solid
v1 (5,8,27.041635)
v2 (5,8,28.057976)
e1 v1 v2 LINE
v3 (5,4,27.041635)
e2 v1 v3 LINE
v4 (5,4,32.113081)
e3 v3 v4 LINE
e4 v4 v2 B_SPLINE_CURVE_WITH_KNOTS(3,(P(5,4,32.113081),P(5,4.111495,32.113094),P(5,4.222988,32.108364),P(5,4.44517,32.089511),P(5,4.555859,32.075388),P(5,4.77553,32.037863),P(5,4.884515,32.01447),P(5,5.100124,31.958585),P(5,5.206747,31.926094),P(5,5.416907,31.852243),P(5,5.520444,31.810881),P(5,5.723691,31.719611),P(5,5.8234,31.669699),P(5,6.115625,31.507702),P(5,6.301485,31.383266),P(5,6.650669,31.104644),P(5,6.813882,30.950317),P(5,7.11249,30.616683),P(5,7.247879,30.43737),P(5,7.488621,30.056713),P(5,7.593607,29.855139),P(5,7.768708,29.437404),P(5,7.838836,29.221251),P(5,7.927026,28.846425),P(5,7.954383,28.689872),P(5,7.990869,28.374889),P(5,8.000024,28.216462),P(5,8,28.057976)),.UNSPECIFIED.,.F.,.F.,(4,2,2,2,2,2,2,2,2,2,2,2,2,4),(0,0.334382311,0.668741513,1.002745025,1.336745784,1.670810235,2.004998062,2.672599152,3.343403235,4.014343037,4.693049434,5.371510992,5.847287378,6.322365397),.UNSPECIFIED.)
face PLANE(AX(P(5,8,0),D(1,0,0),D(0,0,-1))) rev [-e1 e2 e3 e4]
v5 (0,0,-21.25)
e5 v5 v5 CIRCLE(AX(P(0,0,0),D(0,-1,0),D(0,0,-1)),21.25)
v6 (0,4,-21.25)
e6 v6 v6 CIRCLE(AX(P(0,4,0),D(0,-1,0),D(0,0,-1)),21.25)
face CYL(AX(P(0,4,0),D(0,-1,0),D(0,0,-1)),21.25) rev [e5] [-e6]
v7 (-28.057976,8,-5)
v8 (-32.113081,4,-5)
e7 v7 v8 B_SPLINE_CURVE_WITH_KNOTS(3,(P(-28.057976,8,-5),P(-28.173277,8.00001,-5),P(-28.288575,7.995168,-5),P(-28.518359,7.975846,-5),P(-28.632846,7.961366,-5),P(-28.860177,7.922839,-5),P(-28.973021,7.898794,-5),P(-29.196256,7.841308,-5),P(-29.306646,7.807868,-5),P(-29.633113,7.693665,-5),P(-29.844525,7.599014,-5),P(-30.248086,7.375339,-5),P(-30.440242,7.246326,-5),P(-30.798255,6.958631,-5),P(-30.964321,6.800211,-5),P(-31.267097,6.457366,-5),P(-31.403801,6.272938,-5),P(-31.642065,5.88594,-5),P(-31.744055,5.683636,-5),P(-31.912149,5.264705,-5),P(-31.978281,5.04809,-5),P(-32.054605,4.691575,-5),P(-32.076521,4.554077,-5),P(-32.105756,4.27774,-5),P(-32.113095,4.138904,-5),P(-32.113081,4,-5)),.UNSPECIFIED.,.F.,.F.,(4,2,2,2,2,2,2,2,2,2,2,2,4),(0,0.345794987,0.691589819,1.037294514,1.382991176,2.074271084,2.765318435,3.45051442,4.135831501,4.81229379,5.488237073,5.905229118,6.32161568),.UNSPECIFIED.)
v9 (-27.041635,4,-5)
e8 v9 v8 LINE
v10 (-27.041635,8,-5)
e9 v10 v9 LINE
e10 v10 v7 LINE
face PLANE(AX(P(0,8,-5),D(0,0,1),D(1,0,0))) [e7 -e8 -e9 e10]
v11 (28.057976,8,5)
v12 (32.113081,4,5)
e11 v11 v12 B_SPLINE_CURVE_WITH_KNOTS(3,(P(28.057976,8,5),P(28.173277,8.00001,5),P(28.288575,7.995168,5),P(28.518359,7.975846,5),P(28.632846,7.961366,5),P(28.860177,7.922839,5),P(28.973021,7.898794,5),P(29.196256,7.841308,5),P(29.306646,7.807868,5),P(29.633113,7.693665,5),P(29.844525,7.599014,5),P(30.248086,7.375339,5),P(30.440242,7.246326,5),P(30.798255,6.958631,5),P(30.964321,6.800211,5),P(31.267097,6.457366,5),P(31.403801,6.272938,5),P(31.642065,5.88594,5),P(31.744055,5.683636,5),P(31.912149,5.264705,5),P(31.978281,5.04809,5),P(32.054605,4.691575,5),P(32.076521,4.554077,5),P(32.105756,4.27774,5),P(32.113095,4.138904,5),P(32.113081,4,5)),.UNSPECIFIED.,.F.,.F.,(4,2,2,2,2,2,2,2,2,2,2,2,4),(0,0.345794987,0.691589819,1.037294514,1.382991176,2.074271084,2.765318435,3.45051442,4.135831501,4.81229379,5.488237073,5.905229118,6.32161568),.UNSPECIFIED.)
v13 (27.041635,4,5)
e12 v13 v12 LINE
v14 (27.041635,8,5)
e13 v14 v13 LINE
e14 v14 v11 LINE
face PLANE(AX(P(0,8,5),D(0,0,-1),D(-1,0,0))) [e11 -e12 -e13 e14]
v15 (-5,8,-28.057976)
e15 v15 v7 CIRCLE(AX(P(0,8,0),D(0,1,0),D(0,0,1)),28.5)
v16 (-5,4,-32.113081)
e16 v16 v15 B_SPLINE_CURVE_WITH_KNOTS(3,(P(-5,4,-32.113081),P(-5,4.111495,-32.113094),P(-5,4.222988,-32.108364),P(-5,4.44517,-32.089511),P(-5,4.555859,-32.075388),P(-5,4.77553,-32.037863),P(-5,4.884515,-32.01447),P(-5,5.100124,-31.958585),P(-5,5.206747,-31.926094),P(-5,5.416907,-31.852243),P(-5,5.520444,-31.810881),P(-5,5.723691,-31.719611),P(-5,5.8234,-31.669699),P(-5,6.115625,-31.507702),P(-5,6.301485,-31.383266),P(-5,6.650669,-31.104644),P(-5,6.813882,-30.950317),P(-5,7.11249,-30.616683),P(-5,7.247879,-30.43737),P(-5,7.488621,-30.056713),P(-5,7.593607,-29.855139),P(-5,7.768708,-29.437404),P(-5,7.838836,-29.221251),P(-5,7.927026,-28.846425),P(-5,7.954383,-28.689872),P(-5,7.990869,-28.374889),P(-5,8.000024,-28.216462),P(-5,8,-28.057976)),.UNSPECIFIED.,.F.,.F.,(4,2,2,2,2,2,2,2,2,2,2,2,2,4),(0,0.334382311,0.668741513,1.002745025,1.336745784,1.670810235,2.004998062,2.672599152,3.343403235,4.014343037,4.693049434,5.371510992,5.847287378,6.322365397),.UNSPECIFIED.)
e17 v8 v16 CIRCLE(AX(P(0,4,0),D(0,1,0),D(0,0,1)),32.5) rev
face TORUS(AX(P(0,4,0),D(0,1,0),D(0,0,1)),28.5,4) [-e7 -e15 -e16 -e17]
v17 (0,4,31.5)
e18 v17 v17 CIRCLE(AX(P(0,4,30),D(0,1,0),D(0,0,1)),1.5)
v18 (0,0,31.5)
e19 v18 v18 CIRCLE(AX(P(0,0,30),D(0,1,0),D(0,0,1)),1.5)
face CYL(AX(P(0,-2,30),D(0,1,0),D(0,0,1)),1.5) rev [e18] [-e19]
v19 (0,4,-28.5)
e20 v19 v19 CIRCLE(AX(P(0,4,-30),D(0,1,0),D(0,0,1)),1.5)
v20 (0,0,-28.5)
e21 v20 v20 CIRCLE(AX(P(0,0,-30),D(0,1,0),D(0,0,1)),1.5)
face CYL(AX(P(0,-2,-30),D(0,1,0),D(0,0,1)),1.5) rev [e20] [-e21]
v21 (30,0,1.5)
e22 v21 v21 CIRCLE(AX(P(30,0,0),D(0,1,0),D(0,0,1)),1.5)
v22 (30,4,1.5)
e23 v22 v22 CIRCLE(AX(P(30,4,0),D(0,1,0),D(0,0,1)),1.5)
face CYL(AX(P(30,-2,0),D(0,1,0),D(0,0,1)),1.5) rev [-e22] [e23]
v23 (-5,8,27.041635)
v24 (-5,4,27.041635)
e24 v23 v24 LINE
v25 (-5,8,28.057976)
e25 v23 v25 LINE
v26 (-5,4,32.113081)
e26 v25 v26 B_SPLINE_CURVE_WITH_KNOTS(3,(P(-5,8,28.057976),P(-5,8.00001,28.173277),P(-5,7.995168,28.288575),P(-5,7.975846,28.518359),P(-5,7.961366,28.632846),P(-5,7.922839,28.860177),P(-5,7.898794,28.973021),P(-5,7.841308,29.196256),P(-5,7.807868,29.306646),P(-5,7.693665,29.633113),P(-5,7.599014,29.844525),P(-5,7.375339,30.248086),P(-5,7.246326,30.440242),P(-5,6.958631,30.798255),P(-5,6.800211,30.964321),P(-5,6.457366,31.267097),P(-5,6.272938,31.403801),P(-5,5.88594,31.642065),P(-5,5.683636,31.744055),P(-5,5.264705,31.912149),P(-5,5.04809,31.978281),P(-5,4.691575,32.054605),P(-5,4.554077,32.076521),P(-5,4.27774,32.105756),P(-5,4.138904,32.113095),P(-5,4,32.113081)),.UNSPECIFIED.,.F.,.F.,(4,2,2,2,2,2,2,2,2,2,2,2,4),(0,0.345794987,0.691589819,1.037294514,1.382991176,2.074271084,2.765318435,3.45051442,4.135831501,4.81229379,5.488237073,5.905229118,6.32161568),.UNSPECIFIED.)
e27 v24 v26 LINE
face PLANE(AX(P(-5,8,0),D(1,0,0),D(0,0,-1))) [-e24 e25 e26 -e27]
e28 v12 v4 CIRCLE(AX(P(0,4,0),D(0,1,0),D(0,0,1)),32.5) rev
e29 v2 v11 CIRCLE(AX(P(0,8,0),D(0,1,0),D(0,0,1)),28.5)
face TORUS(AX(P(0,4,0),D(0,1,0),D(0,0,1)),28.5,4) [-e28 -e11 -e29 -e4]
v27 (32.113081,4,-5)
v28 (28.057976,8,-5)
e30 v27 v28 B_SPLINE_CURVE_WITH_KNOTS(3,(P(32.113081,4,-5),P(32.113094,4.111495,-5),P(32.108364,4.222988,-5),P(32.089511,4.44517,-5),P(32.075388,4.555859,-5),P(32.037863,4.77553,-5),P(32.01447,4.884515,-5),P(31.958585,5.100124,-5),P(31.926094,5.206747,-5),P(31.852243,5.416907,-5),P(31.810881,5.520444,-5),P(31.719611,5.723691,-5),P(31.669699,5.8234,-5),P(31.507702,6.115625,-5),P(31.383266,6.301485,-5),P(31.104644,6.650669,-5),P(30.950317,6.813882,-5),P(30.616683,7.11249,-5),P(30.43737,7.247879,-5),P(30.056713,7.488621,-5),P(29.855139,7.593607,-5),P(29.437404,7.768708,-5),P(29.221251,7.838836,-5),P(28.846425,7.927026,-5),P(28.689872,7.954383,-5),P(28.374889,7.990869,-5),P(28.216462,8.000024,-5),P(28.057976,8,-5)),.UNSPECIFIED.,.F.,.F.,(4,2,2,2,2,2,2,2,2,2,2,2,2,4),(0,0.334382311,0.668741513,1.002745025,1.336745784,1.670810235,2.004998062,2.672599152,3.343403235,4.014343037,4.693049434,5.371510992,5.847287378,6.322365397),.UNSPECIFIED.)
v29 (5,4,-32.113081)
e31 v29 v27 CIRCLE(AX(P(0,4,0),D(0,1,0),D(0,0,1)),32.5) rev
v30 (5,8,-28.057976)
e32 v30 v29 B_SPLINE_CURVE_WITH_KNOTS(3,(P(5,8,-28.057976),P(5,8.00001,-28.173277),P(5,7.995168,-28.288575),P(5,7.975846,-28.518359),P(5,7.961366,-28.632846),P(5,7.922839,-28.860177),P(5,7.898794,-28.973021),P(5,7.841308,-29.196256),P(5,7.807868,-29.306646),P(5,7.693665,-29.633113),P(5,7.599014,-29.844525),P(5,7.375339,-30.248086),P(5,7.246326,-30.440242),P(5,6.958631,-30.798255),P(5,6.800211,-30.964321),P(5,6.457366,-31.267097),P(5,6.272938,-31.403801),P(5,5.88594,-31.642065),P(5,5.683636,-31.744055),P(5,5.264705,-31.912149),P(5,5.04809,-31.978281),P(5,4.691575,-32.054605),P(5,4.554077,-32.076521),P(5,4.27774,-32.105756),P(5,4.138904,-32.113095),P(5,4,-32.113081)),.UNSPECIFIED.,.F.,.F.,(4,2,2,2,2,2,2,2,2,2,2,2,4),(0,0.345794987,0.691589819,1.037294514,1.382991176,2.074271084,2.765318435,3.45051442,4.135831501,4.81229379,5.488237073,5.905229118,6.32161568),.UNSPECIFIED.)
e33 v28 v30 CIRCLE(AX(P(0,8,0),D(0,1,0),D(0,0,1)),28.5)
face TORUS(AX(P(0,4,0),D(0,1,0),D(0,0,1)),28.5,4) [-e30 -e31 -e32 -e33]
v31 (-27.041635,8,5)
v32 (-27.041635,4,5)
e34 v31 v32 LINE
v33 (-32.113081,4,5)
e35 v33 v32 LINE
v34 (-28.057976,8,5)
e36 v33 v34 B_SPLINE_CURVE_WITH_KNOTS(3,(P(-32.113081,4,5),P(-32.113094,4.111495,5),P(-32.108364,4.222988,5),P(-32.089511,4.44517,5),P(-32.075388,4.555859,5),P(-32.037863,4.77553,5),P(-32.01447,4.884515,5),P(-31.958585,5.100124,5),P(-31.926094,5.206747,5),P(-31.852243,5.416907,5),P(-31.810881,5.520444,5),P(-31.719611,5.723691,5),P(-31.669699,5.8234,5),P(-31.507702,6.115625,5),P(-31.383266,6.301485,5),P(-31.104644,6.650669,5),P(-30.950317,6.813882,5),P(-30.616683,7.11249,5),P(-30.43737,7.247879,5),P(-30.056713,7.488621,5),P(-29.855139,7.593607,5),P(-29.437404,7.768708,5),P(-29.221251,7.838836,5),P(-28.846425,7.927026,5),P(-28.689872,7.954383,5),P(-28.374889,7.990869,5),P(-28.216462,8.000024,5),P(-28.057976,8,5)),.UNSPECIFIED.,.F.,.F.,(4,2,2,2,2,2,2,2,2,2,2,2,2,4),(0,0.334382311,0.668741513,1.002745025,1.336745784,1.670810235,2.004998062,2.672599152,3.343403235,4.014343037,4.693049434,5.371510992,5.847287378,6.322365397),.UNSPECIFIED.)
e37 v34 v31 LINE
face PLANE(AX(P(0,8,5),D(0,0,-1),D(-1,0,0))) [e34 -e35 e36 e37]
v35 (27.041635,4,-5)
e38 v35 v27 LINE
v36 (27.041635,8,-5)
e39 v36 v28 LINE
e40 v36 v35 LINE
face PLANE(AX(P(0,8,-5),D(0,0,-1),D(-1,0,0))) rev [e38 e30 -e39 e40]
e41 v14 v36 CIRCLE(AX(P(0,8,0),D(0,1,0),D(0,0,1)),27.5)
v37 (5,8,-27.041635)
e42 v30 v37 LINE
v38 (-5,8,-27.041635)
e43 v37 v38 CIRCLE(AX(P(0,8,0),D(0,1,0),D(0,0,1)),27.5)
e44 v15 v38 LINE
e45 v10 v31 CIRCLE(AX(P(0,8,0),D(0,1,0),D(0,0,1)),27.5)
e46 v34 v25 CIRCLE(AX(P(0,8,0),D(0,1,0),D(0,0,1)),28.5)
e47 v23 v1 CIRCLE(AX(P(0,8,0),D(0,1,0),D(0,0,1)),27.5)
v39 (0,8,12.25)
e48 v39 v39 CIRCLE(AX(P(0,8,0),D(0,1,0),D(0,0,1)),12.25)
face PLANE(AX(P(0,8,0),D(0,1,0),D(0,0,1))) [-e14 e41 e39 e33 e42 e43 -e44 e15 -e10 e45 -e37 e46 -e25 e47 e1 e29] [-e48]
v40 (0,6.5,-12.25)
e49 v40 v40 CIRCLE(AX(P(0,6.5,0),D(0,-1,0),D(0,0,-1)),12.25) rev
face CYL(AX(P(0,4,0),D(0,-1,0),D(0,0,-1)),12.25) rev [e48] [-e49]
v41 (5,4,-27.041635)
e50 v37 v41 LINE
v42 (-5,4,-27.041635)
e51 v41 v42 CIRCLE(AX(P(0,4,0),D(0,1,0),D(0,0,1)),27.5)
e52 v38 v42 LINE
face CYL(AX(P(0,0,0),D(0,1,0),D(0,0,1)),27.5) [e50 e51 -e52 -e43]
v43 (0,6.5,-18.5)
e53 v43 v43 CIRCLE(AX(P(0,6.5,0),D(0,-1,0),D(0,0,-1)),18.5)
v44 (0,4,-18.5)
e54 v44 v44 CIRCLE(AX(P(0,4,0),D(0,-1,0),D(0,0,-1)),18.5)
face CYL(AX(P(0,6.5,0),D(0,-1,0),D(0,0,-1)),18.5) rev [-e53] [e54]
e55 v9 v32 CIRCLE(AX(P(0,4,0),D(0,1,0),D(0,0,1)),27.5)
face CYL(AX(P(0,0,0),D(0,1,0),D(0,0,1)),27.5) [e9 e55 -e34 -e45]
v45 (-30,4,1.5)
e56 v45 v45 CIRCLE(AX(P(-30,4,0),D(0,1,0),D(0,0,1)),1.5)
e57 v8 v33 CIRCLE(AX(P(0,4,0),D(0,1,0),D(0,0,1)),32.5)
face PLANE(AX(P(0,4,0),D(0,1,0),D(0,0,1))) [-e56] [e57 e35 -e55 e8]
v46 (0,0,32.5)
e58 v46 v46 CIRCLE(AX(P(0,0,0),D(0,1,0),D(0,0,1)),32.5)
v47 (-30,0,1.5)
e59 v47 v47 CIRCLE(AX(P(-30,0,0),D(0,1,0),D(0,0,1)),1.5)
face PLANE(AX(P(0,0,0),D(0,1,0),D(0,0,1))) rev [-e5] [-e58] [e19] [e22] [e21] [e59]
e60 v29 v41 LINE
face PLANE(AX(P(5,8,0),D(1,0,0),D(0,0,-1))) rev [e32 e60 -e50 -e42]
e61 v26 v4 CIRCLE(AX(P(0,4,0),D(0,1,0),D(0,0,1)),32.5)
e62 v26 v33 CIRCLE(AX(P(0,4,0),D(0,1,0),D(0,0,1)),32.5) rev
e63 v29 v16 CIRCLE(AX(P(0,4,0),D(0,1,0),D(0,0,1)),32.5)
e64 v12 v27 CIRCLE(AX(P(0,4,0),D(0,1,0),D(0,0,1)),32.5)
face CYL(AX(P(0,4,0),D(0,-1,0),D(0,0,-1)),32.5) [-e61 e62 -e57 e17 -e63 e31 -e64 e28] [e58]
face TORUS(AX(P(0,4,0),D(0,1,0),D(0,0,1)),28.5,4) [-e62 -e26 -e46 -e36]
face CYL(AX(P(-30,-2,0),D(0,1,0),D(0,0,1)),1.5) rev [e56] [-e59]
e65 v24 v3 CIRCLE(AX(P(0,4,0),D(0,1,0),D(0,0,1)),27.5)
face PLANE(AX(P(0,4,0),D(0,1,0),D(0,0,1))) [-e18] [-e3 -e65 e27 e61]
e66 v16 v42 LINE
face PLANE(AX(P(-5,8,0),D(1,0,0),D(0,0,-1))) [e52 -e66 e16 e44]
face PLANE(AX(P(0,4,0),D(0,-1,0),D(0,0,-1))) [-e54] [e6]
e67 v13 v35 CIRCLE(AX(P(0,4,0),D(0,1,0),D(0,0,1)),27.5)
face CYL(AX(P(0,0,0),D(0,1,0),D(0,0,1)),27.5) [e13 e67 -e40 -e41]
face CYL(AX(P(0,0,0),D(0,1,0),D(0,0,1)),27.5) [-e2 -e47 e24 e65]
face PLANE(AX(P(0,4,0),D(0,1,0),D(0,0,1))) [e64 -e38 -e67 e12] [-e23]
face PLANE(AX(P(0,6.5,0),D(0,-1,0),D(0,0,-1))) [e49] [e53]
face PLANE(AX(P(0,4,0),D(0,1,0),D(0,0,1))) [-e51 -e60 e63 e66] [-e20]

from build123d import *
from build123d.topology import SkipClean

# Parameters (mm, degrees)
SKETCH1_R           = 32.5
SKETCH1_R_2         = 27.5
BOSS_EXTRUDE1_DEPTH = 4
BOSS_EXTRUDE2_DEPTH = 4
SKETCH3_R           = 1.5
CUT_EXTRUDE1_DEPTH  = 6
BOSS_EXTRUDE4_START = -8
SKETCH7_R           = 25
BOSS_EXTRUDE4_DEPTH = 8
SKETCH8_R           = 27.5
SKETCH8_R_2         = 12.25
BOSS_EXTRUDE5_DEPTH = 4
SKETCH10_R          = 25
SKETCH10_R_2        = 12.25
BOSS_EXTRUDE6_DEPTH = 4
FILLET3_R           = 4
SKETCH11_R          = 21.25
CUT_EXTRUDE2_DEPTH  = 4
SKETCH14_R          = 18.5
CUT_EXTRUDE3_DEPTH  = 2.5


with BuildPart() as part:
    # Sketch1 → Boss-Extrude1 (new body)
    with BuildSketch(Plane(origin=(0, 0, 0), x_dir=(1, 0, 0), z_dir=(0, 1, 0))):
        with Locations(Location((0, 0, 0), (0, 0, 270))):
            Circle(SKETCH1_R)
        with Locations(Location((0, 0, 0), (0, 0, 270))):
            Circle(SKETCH1_R_2, mode=Mode.SUBTRACT)
    extrude(amount=BOSS_EXTRUDE1_DEPTH)

    # Sketch2 → Boss-Extrude2 (add)
    with SkipClean():  # the faces are left unmerged after this step: merging them gives an invalid solid
        with BuildSketch(Plane(origin=(0, 4, 0), x_dir=(1, 0, 0), z_dir=(0, 1, 0))):
            with BuildLine():
                ThreePointArc((-5, 32.113081447), (-22.980970389, 22.980970389), (-32.113081447, 5))
                Line((-32.113081447, 5), (-30, 5))
                Line((-30, 5), (-27.041634566, 5))
                ThreePointArc((-27.041634566, 5), (-19.445436483, 19.445436483), (-5, 27.041634566))
                Line((-5, 27.041634566), (-5, 32.113081447))
            make_face()
            with BuildLine():
                Line((-27.041634566, -5), (-32.113081447, -5))
                ThreePointArc((-32.113081447, -5), (-22.980970389, -22.980970389), (-5, -32.113081447))
                Line((-5, -32.113081447), (-5, -27.041634566))
                ThreePointArc((-5, -27.041634566), (-19.445436483, -19.445436483), (-27.041634566, -5))
            make_face()
            with BuildLine():
                Line((5, -27.041634566), (5, -32.113081447))
                ThreePointArc((5, -32.113081447), (22.980970389, -22.980970389), (32.113081447, -5))
                Line((32.113081447, -5), (27.041634566, -5))
                ThreePointArc((27.041634566, -5), (19.445436483, -19.445436483), (5, -27.041634566))
            make_face()
            with BuildLine():
                ThreePointArc((32.113081447, 5), (22.980970389, 22.980970389), (5, 32.113081447))
                Line((5, 32.113081447), (5, 27.041634566))
                ThreePointArc((5, 27.041634566), (19.445436483, 19.445436483), (27.041634566, 5))
                Line((27.041634566, 5), (32.113081447, 5))
            make_face()
        extrude(amount=BOSS_EXTRUDE2_DEPTH)

    # Sketch3 → Cut-Extrude1 (cut)
    with SkipClean():  # the faces are left unmerged after this step: merging them gives an invalid solid
        with BuildSketch(Plane(origin=(0, 4, 0), x_dir=(1, 0, 0), z_dir=(0, 1, 0))):
            with Locations(Location((0, 30, 0), (0, 0, 270))):
                Circle(SKETCH3_R)
            with Locations(Location((30, 0, 0), (0, 0, 270))):
                Circle(SKETCH3_R)
            with Locations(Location((0, -30, 0), (0, 0, 270))):
                Circle(SKETCH3_R)
            with Locations(Location((-30, 0, 0), (0, 0, 270))):
                Circle(SKETCH3_R)
        extrude(amount=-CUT_EXTRUDE1_DEPTH, mode=Mode.SUBTRACT)

    # Sketch7 → Boss-Extrude4 (add)
    # profile 1 of 5: a face of its own
    with BuildSketch(Plane(origin=(0, 8, 0), x_dir=(1, 0, 0), z_dir=(0, 1, 0)).offset(BOSS_EXTRUDE4_START)):
        with BuildLine():
            ThreePointArc((-27.041634566, 5), (-19.445436483, 19.445436483), (-5, 27.041634566))
            Line((-5, 27.041634566), (-5, 32.113081447))
            ThreePointArc((-5, 32.113081447), (-22.980970389, 22.980970389), (-32.113081447, 5))
            Line((-32.113081447, 5), (-27.041634566, 5))
        make_face()
    # profile 2 of 5: a face of its own
    with BuildSketch(Plane(origin=(0, 8, 0), x_dir=(1, 0, 0), z_dir=(0, 1, 0)).offset(BOSS_EXTRUDE4_START)):
        with BuildLine():
            Line((27.041634566, 5), (32.113081447, 5))
            ThreePointArc((32.113081447, 5), (22.980970389, 22.980970389), (5, 32.113081447))
            Line((5, 32.113081447), (5, 27.041634566))
            ThreePointArc((5, 27.041634566), (19.445436483, 19.445436483), (27.041634566, 5))
        make_face()
    # profile 3 of 5: a face of its own
    with BuildSketch(Plane(origin=(0, 8, 0), x_dir=(1, 0, 0), z_dir=(0, 1, 0)).offset(BOSS_EXTRUDE4_START)):
        with BuildLine():
            Line((5, -27.041634566), (5, -32.113081447))
            ThreePointArc((5, -32.113081447), (22.980970389, -22.980970389), (32.113081447, -5))
            Line((32.113081447, -5), (27.041634566, -5))
            ThreePointArc((27.041634566, -5), (19.445436483, -19.445436483), (5, -27.041634566))
        make_face()
    # profile 4 of 5: a face of its own
    with BuildSketch(Plane(origin=(0, 8, 0), x_dir=(1, 0, 0), z_dir=(0, 1, 0)).offset(BOSS_EXTRUDE4_START)):
        with BuildLine():
            Line((-27.041634566, -5), (-32.113081447, -5))
            ThreePointArc((-32.113081447, -5), (-22.980970389, -22.980970389), (-5, -32.113081447))
            Line((-5, -32.113081447), (-5, -27.041634566))
            ThreePointArc((-5, -27.041634566), (-19.445436483, -19.445436483), (-27.041634566, -5))
        make_face()
    # profile 5 of 5: a face of its own
    with BuildSketch(Plane(origin=(0, 8, 0), x_dir=(1, 0, 0), z_dir=(0, 1, 0)).offset(BOSS_EXTRUDE4_START)):
        with BuildLine():
            ThreePointArc((-27.041634566, -5), (-19.445436483, -19.445436483), (-5, -27.041634566))
            ThreePointArc((-5, -27.041634566), (0, -27.5), (5, -27.041634566))
            ThreePointArc((5, -27.041634566), (19.445436483, -19.445436483), (27.041634566, -5))
            ThreePointArc((27.041634566, -5), (27.385168893, -2.510482965), (27.5, 0))
            ThreePointArc((27.5, 0), (27.385168893, 2.510482965), (27.041634566, 5))
            ThreePointArc((27.041634566, 5), (19.445436483, 19.445436483), (5, 27.041634566))
            ThreePointArc((5, 27.041634566), (0, 27.5), (-5, 27.041634566))
            ThreePointArc((-5, 27.041634566), (-19.445436483, 19.445436483), (-27.041634566, 5))
            ThreePointArc((-27.041634566, 5), (-27.5, 0), (-27.041634566, -5))
        make_face()
        with Locations(Location((0, 0, 0), (0, 0, 270))):
            Circle(SKETCH7_R, mode=Mode.SUBTRACT)
    extrude(amount=BOSS_EXTRUDE4_DEPTH)

    # Sketch8 → Boss-Extrude5 (add)
    with BuildSketch(Plane(origin=(0, 0, 0), x_dir=(-1, 0, 0), z_dir=(0, -1, 0))):
        Circle(SKETCH8_R)
        with Locations(Location((0, 0, 0), (0, 0, 90))):
            Circle(SKETCH8_R_2, mode=Mode.SUBTRACT)
    extrude(amount=-BOSS_EXTRUDE5_DEPTH)

    # Sketch10 → Boss-Extrude6 (add)
    with BuildSketch(Plane(origin=(0, 4, 0), x_dir=(1, 0, 0), z_dir=(0, 1, 0))):
        Circle(SKETCH10_R)
        with Locations(Location((0, 0, 0), (0, 0, 90))):
            Circle(SKETCH10_R_2, mode=Mode.SUBTRACT)
    extrude(amount=BOSS_EXTRUDE6_DEPTH)

    # Fillet3
    fillet3_edges = [part.edges().sort_by_distance(p)[0] for p in [
        (22.980970389, 8, -22.980970389),
        (22.980970389, 8, 22.980970389),
        (-22.980970389, 8, 22.980970389),
        (-22.980970389, 8, -22.980970389),
    ]]
    fillet(fillet3_edges, radius=FILLET3_R - 0.0001)  # a hair under: the kernel refuses the full size

    # Sketch11 → Cut-Extrude2 (cut)
    with BuildSketch(Plane.XZ):
        with Locations(Location((0, 0, 0), (0, 0, 270))):
            Circle(SKETCH11_R)
    extrude(amount=-CUT_EXTRUDE2_DEPTH, mode=Mode.SUBTRACT)

    # Sketch14 → Cut-Extrude3 (cut)
    with BuildSketch(Plane.XZ.offset(-4)):
        with Locations(Location((0, 0, 0), (0, 0, 270))):
            Circle(SKETCH14_R)
    extrude(amount=-CUT_EXTRUDE3_DEPTH, mode=Mode.SUBTRACT)


solid = part.part
